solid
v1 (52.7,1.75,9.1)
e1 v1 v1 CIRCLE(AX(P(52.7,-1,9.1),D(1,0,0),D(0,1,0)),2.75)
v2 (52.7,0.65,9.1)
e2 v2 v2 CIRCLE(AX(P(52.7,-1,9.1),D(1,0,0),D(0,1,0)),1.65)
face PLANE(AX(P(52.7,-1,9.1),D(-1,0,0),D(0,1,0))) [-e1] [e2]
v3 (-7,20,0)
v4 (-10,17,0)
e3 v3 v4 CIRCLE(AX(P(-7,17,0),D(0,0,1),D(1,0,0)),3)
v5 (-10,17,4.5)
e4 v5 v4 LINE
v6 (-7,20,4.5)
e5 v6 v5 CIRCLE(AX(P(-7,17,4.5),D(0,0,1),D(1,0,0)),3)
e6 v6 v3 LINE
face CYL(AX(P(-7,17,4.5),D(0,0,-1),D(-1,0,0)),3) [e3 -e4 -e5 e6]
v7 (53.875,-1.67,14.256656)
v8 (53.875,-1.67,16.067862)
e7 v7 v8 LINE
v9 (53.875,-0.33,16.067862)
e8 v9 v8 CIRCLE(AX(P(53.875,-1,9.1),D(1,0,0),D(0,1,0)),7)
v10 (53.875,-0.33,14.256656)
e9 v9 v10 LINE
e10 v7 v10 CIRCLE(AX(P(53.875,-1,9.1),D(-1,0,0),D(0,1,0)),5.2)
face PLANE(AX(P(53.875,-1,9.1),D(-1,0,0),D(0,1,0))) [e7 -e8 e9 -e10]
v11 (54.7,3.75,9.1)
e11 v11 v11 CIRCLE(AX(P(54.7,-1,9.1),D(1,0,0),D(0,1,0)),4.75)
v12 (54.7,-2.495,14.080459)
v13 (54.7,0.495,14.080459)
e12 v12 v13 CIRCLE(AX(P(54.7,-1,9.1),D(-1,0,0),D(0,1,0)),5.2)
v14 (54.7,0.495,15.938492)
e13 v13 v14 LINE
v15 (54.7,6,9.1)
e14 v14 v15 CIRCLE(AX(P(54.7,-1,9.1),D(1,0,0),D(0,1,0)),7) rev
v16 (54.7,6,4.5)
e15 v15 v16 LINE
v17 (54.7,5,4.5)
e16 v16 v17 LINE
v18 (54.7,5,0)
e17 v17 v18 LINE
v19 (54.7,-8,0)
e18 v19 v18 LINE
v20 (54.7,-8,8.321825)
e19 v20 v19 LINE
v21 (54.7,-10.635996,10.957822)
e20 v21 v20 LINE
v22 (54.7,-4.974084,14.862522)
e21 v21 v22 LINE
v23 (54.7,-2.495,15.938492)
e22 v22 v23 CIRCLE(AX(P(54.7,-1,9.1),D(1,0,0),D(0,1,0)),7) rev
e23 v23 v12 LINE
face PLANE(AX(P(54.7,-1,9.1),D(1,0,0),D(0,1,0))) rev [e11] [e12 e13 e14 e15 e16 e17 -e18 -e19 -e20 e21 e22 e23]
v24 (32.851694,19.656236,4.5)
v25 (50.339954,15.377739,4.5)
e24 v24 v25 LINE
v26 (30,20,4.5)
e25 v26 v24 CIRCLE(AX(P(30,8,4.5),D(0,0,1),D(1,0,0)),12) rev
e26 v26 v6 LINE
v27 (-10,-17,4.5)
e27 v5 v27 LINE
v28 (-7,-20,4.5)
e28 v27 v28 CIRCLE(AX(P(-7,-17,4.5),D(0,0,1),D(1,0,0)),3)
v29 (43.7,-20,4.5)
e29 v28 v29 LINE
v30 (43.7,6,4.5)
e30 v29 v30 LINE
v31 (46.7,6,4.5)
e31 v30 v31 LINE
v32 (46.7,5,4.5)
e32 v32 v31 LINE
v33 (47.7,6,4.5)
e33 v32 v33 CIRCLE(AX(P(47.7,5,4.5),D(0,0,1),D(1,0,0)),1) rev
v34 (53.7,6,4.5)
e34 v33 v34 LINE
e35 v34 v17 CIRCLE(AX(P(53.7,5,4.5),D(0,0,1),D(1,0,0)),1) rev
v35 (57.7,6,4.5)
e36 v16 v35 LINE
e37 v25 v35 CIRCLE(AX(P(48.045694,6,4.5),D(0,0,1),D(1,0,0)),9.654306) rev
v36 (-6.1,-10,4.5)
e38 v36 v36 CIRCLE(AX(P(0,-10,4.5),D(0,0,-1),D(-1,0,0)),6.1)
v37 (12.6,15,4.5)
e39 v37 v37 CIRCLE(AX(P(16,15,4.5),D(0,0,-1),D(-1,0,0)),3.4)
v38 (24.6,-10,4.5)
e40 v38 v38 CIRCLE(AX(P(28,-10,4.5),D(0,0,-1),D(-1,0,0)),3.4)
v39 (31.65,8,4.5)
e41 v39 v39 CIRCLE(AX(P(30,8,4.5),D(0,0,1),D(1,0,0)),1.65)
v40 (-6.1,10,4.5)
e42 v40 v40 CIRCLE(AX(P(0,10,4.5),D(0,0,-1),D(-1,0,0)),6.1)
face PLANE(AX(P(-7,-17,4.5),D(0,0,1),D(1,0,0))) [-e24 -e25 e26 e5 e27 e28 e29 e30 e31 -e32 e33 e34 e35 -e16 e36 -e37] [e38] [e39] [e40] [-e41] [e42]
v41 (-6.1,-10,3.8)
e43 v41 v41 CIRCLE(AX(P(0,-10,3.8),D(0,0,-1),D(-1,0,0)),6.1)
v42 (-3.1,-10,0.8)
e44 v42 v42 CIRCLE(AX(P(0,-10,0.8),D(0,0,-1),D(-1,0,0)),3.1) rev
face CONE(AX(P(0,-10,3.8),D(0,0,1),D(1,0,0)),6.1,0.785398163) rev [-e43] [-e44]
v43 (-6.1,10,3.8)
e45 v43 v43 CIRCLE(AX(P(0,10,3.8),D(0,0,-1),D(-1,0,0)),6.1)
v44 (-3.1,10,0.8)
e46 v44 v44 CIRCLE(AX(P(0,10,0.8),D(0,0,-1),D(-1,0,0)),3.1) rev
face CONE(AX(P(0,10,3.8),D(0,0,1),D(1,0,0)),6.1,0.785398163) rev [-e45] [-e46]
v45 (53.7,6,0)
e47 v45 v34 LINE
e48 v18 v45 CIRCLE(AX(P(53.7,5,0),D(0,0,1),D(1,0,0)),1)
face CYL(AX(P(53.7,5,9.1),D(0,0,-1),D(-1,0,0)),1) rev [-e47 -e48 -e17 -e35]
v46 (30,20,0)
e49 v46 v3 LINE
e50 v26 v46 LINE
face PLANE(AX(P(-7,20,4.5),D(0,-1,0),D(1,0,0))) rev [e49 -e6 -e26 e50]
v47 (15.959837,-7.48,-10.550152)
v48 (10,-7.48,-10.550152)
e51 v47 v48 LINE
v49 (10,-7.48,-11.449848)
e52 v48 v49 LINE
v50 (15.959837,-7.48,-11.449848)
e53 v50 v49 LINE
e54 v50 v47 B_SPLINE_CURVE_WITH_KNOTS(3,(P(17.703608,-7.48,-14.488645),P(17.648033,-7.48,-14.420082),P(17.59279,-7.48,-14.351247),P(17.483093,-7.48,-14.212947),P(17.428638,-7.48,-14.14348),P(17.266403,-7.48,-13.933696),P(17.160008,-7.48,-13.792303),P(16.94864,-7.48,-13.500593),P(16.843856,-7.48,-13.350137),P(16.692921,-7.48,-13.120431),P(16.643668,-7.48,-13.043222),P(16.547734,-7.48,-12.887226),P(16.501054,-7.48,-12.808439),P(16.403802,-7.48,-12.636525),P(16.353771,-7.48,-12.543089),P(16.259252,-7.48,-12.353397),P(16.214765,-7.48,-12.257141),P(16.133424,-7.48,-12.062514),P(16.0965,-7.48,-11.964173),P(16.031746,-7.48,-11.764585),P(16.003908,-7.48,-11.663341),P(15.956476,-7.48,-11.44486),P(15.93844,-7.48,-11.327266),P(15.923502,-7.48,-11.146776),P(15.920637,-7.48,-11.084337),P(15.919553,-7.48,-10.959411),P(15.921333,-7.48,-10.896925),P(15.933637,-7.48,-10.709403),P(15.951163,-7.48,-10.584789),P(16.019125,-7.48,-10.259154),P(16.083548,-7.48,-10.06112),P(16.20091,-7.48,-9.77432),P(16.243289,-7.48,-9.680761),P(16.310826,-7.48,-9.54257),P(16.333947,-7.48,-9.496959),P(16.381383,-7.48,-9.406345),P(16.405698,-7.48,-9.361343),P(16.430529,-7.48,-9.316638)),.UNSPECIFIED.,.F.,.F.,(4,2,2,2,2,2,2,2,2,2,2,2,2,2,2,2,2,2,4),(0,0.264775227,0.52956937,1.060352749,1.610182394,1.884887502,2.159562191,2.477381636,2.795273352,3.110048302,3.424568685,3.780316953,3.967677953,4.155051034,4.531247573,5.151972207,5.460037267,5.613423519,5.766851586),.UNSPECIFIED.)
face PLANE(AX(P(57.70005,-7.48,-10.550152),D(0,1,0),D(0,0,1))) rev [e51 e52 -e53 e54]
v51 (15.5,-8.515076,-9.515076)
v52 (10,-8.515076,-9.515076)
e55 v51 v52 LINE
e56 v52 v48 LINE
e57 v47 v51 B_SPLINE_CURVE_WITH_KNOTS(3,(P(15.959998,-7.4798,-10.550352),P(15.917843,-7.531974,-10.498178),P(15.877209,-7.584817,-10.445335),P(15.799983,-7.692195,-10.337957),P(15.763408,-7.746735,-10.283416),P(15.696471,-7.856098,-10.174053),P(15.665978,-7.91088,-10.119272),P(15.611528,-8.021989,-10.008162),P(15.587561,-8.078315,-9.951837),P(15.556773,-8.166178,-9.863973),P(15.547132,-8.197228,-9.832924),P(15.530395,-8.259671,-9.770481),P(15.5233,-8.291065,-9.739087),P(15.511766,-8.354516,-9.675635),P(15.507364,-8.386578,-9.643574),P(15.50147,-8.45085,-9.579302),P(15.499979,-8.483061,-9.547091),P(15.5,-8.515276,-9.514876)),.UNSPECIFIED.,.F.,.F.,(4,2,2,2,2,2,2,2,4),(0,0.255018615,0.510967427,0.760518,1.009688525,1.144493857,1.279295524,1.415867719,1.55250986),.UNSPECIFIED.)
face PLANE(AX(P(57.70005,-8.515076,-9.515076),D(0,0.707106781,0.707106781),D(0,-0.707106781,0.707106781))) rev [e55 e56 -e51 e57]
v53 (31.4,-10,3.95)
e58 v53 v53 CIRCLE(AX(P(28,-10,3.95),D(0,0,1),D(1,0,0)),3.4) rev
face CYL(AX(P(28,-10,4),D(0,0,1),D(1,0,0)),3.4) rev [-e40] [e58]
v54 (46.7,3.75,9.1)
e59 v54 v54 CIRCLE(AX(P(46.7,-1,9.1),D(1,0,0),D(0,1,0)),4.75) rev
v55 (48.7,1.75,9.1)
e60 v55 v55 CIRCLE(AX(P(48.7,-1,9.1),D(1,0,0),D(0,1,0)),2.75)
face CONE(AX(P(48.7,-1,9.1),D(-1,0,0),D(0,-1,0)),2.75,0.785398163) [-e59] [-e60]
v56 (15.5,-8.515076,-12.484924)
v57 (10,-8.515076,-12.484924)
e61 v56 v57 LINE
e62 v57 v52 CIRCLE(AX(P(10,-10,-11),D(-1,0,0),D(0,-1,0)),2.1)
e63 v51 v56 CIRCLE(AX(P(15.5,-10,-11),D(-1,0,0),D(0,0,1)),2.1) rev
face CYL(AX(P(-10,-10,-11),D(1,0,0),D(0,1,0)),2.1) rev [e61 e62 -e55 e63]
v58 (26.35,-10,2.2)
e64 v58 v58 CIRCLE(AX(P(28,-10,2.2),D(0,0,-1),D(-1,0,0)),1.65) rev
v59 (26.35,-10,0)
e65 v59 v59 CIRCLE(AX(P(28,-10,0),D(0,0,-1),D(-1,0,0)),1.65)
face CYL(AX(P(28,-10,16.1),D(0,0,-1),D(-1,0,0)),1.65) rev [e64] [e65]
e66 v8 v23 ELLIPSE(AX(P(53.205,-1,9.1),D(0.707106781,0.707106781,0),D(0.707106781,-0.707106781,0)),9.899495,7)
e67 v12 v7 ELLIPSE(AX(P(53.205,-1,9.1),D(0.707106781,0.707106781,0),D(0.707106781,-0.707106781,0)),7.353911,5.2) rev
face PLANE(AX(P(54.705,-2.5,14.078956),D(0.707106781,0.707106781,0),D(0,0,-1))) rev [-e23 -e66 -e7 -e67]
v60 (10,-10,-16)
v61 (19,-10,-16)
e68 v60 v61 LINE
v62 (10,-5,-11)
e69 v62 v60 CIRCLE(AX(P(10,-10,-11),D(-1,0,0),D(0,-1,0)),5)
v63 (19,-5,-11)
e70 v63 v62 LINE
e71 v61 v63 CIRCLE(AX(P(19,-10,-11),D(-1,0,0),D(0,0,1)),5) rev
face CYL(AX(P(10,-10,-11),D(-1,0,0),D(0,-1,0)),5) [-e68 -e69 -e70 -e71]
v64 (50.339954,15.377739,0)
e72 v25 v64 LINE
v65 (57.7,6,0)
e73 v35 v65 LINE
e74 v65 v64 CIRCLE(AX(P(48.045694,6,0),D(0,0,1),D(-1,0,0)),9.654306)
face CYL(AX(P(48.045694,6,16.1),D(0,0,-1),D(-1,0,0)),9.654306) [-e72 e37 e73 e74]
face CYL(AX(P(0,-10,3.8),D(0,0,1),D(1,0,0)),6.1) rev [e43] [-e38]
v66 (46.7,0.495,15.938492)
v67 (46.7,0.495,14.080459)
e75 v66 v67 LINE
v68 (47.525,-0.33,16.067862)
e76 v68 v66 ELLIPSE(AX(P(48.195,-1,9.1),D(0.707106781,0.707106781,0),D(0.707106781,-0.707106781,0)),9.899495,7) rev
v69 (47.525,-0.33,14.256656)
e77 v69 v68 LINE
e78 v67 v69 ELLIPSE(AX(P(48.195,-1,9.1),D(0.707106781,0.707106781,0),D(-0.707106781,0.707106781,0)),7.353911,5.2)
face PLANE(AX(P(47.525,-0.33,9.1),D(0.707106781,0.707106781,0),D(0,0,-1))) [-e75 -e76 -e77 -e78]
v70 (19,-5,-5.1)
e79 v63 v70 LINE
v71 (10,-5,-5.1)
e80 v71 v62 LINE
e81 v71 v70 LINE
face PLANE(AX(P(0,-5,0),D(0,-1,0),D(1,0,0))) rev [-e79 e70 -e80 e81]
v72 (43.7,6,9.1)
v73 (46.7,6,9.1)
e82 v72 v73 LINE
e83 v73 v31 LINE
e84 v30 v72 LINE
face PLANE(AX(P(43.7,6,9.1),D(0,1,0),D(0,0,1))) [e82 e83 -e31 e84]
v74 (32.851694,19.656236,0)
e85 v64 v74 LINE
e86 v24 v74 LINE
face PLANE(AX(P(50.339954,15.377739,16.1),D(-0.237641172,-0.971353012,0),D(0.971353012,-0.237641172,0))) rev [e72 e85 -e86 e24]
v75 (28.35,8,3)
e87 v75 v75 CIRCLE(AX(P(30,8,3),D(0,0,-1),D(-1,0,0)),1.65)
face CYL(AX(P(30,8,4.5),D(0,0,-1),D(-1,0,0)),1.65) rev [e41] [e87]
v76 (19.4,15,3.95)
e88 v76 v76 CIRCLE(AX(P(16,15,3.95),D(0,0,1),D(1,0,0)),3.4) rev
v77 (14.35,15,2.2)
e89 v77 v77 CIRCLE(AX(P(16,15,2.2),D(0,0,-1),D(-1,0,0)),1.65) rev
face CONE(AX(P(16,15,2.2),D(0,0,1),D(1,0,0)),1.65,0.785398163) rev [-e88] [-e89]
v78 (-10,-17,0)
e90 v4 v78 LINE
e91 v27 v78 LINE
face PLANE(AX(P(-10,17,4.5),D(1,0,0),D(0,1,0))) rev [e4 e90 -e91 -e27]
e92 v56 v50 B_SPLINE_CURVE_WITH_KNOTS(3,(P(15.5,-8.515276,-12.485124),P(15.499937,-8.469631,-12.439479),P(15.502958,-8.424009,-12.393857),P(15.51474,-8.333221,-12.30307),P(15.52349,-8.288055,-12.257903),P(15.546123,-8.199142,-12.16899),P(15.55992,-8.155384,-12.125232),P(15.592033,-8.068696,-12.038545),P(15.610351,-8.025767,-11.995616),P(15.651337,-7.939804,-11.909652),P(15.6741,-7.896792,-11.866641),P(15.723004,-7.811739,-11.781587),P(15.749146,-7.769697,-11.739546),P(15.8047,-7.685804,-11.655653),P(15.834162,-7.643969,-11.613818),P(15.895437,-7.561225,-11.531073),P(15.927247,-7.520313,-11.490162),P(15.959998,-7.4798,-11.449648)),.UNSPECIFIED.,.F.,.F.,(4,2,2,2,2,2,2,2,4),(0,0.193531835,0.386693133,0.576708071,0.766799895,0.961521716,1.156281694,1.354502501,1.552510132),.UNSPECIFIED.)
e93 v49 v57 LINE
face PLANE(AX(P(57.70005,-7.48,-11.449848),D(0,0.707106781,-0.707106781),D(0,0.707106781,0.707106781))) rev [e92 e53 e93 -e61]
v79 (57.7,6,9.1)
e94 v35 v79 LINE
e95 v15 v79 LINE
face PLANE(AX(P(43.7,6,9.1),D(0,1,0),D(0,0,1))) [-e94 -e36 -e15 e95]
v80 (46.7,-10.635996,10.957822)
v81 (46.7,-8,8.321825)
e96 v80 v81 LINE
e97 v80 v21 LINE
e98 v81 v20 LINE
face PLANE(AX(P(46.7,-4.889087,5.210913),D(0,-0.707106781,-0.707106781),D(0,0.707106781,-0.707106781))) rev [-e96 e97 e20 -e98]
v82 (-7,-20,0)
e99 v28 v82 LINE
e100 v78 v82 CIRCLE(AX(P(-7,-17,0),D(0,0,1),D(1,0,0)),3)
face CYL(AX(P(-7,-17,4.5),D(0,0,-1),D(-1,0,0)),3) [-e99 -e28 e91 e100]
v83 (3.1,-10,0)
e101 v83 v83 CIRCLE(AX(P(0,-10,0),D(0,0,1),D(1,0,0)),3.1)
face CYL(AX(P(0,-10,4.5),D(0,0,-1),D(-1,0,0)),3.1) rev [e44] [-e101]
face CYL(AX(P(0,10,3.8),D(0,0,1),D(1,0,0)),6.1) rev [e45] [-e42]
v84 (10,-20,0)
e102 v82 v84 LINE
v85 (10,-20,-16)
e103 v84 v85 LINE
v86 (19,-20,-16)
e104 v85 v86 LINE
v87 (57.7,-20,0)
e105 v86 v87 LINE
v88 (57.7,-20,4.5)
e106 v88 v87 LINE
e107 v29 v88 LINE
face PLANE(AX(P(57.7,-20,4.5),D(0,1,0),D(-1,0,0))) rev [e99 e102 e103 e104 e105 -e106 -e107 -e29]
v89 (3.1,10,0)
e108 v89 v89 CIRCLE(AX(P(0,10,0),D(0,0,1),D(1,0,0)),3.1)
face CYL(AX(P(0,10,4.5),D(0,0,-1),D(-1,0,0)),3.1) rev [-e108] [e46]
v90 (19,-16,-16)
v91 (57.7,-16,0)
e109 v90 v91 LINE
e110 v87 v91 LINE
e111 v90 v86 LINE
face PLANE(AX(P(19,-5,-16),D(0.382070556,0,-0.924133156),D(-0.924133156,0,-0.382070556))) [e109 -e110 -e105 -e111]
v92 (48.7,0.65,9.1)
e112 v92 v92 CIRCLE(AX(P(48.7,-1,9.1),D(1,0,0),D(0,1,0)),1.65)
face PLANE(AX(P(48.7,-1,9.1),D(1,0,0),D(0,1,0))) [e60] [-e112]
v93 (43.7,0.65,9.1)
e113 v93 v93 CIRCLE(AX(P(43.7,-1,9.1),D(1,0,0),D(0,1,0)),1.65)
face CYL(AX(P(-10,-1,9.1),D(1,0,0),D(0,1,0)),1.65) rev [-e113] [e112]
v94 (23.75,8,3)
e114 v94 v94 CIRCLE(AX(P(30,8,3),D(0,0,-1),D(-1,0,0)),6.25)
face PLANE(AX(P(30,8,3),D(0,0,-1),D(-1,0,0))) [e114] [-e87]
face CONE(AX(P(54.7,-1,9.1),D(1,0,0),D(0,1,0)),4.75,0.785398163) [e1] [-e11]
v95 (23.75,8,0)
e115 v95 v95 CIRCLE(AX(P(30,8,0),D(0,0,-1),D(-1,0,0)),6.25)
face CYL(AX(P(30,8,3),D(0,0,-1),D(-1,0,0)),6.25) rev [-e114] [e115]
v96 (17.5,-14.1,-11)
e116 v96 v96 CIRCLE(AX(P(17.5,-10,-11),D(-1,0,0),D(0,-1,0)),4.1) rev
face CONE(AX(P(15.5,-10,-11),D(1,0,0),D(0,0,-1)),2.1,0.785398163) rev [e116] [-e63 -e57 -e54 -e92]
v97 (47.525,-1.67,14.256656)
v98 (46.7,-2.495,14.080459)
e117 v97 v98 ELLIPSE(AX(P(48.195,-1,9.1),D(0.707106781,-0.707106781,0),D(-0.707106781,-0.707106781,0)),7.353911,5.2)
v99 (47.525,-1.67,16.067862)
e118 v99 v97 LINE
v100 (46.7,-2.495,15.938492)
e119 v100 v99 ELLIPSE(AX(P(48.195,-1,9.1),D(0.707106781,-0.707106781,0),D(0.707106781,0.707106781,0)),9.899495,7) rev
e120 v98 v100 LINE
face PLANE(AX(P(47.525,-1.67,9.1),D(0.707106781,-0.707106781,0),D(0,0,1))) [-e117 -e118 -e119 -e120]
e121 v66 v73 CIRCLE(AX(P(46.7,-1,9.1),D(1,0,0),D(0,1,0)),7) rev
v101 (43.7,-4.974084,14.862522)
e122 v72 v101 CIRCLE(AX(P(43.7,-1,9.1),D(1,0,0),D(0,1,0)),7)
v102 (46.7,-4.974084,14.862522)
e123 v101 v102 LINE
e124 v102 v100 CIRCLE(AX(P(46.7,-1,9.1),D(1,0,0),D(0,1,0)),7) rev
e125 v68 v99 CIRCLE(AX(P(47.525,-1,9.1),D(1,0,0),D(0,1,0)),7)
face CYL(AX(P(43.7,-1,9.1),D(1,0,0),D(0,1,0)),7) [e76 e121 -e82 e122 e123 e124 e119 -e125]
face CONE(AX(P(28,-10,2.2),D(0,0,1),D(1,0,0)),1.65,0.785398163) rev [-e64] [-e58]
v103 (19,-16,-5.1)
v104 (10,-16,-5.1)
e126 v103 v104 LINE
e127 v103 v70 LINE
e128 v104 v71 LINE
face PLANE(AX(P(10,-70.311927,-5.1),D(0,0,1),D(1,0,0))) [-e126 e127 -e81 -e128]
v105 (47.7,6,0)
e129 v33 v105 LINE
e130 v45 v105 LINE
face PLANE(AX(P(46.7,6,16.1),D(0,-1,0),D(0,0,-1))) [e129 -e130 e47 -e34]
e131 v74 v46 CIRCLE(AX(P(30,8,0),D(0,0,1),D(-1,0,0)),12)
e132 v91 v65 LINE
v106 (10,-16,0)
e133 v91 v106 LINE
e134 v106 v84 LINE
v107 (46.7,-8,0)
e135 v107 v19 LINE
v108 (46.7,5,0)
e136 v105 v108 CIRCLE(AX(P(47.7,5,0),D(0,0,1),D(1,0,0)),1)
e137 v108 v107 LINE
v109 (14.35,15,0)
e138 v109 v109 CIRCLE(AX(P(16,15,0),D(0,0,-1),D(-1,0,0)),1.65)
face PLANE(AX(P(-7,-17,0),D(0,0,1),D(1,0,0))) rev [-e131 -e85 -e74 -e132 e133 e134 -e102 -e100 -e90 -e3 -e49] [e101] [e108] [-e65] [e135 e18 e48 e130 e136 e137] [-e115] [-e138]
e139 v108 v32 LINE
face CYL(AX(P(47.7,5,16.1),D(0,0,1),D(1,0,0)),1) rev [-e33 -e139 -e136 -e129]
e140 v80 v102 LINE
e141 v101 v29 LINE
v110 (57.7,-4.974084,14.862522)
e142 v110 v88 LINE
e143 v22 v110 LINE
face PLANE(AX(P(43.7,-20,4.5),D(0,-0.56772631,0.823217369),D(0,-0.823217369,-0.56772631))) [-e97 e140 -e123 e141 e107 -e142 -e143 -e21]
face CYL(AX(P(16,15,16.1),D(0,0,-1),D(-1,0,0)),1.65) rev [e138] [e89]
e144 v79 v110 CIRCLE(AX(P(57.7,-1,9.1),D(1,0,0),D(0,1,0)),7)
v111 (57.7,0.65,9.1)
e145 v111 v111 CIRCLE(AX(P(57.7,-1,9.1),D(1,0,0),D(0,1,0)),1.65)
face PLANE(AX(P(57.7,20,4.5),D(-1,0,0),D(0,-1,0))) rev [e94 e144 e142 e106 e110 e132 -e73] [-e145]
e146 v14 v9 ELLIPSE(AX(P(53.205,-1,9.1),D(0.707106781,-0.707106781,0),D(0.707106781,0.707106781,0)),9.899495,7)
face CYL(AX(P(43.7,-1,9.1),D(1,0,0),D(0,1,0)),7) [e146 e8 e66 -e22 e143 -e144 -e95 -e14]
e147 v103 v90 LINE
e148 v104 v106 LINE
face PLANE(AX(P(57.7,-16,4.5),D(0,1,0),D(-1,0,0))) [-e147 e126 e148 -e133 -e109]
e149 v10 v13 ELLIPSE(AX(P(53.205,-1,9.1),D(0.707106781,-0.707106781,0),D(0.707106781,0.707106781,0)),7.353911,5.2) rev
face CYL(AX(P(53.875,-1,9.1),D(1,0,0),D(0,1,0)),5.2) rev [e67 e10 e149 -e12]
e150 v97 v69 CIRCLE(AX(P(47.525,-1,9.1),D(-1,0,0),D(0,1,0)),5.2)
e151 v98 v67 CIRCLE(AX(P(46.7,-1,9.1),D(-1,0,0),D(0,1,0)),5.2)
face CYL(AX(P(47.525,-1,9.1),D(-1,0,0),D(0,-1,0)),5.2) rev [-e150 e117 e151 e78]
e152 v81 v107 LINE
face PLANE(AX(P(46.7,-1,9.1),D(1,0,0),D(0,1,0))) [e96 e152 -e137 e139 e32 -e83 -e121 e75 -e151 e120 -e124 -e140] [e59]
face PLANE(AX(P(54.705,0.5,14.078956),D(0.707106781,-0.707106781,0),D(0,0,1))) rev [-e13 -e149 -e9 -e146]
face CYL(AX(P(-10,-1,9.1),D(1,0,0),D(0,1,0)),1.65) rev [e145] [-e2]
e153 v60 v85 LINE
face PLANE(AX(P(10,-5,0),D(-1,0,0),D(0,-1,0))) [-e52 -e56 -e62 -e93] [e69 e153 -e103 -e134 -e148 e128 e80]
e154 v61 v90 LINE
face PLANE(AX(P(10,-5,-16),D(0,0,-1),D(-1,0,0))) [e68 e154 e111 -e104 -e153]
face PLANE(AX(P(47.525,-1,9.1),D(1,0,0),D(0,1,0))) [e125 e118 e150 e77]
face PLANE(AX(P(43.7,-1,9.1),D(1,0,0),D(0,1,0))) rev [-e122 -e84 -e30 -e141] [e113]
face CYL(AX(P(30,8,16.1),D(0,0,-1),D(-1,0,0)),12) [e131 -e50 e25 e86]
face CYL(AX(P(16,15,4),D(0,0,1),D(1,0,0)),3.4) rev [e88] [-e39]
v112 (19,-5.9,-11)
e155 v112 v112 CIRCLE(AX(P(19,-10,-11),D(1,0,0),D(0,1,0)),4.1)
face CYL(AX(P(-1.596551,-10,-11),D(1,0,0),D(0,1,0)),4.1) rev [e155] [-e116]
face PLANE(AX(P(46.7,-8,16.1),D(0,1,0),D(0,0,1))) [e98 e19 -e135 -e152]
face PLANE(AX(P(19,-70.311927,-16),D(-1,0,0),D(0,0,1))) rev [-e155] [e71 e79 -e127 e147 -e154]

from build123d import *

# Parameters (mm, degrees)
SKETCH1_R           = 3.1
SKETCH1_R_2         = 1.65
BOSS_EXTRUDE1_DEPTH = 4.5
BOSS_EXTRUDE2_DEPTH = 15
BOSS_EXTRUDE3_DEPTH = 14
CUT_EXTRUDE1_DEPTH  = 11
SKETCH5_R           = 1.65
CUT_EXTRUDE2_DEPTH  = 73.405110317
CUT_EXTRUDE3_START  = -3
CUT_EXTRUDE3_DEPTH  = 8
FILLET1_R           = 5
SKETCH7_R           = 2.1
CUT_EXTRUDE4_DEPTH  = 47.44243749
SKETCH8_R           = 4.1
CUT_EXTRUDE5_DEPTH  = 1.5
CHAMFER1_SIZE       = 2
CUT_EXTRUDE6_DEPTH  = 64.154572281
CUT_EXTRUDE7_DEPTH  = 64.154572281
SKETCH11_R          = 1.65
CUT_EXTRUDE9_DEPTH  = 64.154572281
BOSS_EXTRUDE4_START = 2
SKETCH13_R          = 2.75
SKETCH13_R_2        = 1.65
BOSS_EXTRUDE4_DEPTH = 2
BOSS_EXTRUDE5_START = 0.825
BOSS_EXTRUDE5_DEPTH = 0.825
CHAMFER3_SIZE       = 2
SKETCH14_R          = 6.1
CUT_EXTRUDE10_DEPTH = 0.7
CHAMFER4_SIZE       = 3
CHAMFER5_SIZE       = 0.83
SKETCH16_R          = 3.4
CUT_EXTRUDE11_DEPTH = 0.5
CHAMFER6_SIZE       = 1.8
CUT_EXTRUDE12_DEPTH = 55.171025466
SKETCH18_R          = 6.25
CUT_EXTRUDE13_DEPTH = 3
FILLET2_R           = 1


# Some blends are built 0.0001 mm under size
with BuildPart() as part:
    # Sketch1 → Boss-Extrude1 (new body)
    with BuildSketch(Plane.XY):
        with BuildLine():
            Line((-10, 17), (-10, -17))
            ThreePointArc((-10, -17), (-9.121320344, -19.121320344), (-7, -20))
            Line((-7, -20), (57.7, -20))
            Line((57.7, -20), (57.7, 20))
            Line((57.7, 20), (10, 20))
            Line((10, 20), (-7, 20))
            ThreePointArc((-7, 20), (-9.121320344, 19.121320344), (-10, 17))
        make_face()
        with Locations((0, 10)):
            Circle(SKETCH1_R, mode=Mode.SUBTRACT)
        with Locations((0, -10)):
            Circle(SKETCH1_R, mode=Mode.SUBTRACT)
        with Locations((30, 8)):
            Circle(SKETCH1_R_2, mode=Mode.SUBTRACT)
    extrude(amount=BOSS_EXTRUDE1_DEPTH)

    # Sketch2 → Boss-Extrude2 (add)
    with BuildSketch(Plane.XZ.offset(20)):
        Polygon((10, 0), (10, -16), (19, -16), (57.7, 0), align=None)
    extrude(amount=-BOSS_EXTRUDE2_DEPTH)

    # Sketch3 → Boss-Extrude3 (add)
    with BuildSketch(Plane(origin=(57.7, 0, 0), x_dir=(0, 0, -1), z_dir=(1, 0, 0))):
        with BuildLine():
            Line((-9.1, 6), (-4.5, 6))
            Line((-4.5, 6), (-4.5, -20))
            Line((-4.5, -20), (-14.862521583, -4.974084173))
            ThreePointArc((-14.862521583, -4.974084173), (-15.297523264, 2.254336399), (-9.1, 6))
        make_face()
    extrude(amount=-BOSS_EXTRUDE3_DEPTH)

    # Sketch4 → Cut-Extrude1 (cut)
    with BuildSketch(Plane(origin=(0, -5, 0), x_dir=(1, 0, 0), z_dir=(0, 1, 0))):
        Polygon((10, 0), (57.7, 0), (57.7, 16), (19, 16), (19, 5.1), (10, 5.1), align=None)
    extrude(amount=-CUT_EXTRUDE1_DEPTH, mode=Mode.SUBTRACT)

    # Sketch5 → Cut-Extrude2 (cut, through all)
    with BuildSketch(Plane(origin=(57.7, 0, 0), x_dir=(0, 0, -1), z_dir=(1, 0, 0))):
        with Locations(Location((-9.1, -1, 0), (0, 0, 90))):
            Circle(SKETCH5_R)
    extrude(amount=-CUT_EXTRUDE2_DEPTH, mode=Mode.SUBTRACT)

    # Sketch6 → Cut-Extrude3 (cut)
    with BuildSketch(Plane(origin=(57.7, 0, 0), x_dir=(0, 0, -1), z_dir=(1, 0, 0)).offset(CUT_EXTRUDE3_START)):
        with BuildLine():
            Line((-5.210912703, -4.889087297), (-19.214201662, -18.892376255))
            Line((-19.214201662, -18.892376255), (-19.214201662, 16.892376255))
            Line((-19.214201662, 16.892376255), (-5.210912703, 2.889087297))
            ThreePointArc((-5.210912703, 2.889087297), (-3.6, -1), (-5.210912703, -4.889087297))
        make_face()
    extrude(amount=-CUT_EXTRUDE3_DEPTH, mode=Mode.SUBTRACT)

    # Fillet1
    fillet1_edges = [part.edges().sort_by_distance(p)[0] for p in [
        (14.5, -5, -16),
    ]]
    fillet(fillet1_edges, radius=FILLET1_R)

    # Sketch7 → Cut-Extrude4 (cut, through all)
    with BuildSketch(Plane(origin=(19, 0, 0), x_dir=(0, 0, -1), z_dir=(1, 0, 0))):
        with Locations(Location((11, -10, 0), (0, 0, 90))):
            Circle(SKETCH7_R)
    extrude(amount=-CUT_EXTRUDE4_DEPTH, mode=Mode.SUBTRACT)

    # Sketch8 → Cut-Extrude5 (cut)
    with BuildSketch(Plane(origin=(19, 0, 0), x_dir=(0, 0, -1), z_dir=(1, 0, 0))):
        with Locations(Location((11, -10, 0), (0, 0, 90))):
            Circle(SKETCH8_R)
    extrude(amount=-CUT_EXTRUDE5_DEPTH, mode=Mode.SUBTRACT)

    # Chamfer1
    chamfer1_edges = [part.edges().sort_by_distance(p)[0] for p in [
        (17.5, -12.1, -11),
    ]]
    chamfer(chamfer1_edges, length=CHAMFER1_SIZE - 0.0001)  # a hair under: the kernel refuses the full size

    # Sketch9 → Cut-Extrude6 (cut, through all)
    with BuildSketch(Plane.XY):
        Polygon((46.7, 6), (54.7, 6), (54.7, 3.5), (54.7, -5.5), (54.7, -8), (46.7, -8), (46.7, -5.5), (46.7, 3.5), align=None)
    extrude(amount=CUT_EXTRUDE6_DEPTH, mode=Mode.SUBTRACT)

    # Sketch10 → Cut-Extrude7 (cut, through all)
    with BuildSketch(Plane(origin=(0, 0, 0), x_dir=(-1, 0, 0), z_dir=(0, 0, -1))):
        with BuildLine():
            Line((-57.7, 6), (-57.7, 20))
            Line((-57.7, 20), (-30, 20))
            ThreePointArc((-30, 20), (-31.436169615, 19.913749067), (-32.851694068, 19.65623614))
            Line((-32.851694068, 19.65623614), (-50.33995445, 15.377739394))
            ThreePointArc((-50.33995445, 15.377739394), (-55.640268278, 11.96054248), (-57.7, 6))
        make_face()
    extrude(amount=-CUT_EXTRUDE7_DEPTH, mode=Mode.SUBTRACT)

    # Sketch11 → Cut-Extrude9 (cut, through all)
    with BuildSketch(Plane(origin=(0, 0, 0), x_dir=(-1, 0, 0), z_dir=(0, 0, -1))):
        with Locations((-16, 15)):
            Circle(SKETCH11_R)
        with Locations((-28, -10)):
            Circle(SKETCH11_R)
    extrude(amount=-CUT_EXTRUDE9_DEPTH, mode=Mode.SUBTRACT)

    # Sketch13 → Boss-Extrude4 (add)
    with BuildSketch(Plane(origin=(46.7, 0, 0), x_dir=(0, 0, -1), z_dir=(1, 0, 0)).offset(BOSS_EXTRUDE4_START)):
        with Locations(Location((-9.1, -1, 0), (0, 0, 90))):
            Circle(SKETCH13_R)
        with Locations(Location((-9.1, -1, 0), (0, 0, 90))):
            Circle(SKETCH13_R_2, mode=Mode.SUBTRACT)
    boss_extrude4 = extrude(amount=-BOSS_EXTRUDE4_DEPTH)

    # Sketch15 → Boss-Extrude5 (add)
    with BuildSketch(Plane(origin=(46.7, 0, 0), x_dir=(0, 0, -1), z_dir=(1, 0, 0)).offset(BOSS_EXTRUDE5_START)):
        with BuildLine():
            Line((-14.078955714, 0.5), (-15.937397166, 0.5))
            ThreePointArc((-15.937397166, 0.5), (-16.1, -1), (-15.937397166, -2.5))
            Line((-15.937397166, -2.5), (-14.078955714, -2.5))
            ThreePointArc((-14.078955714, -2.5), (-14.3, -1), (-14.078955714, 0.5))
        make_face()
    boss_extrude5 = extrude(amount=-BOSS_EXTRUDE5_DEPTH)

    # Mirror1: Boss-Extrude4, Boss-Extrude5 across plane
    add(boss_extrude4.mirror(Plane(origin=(50.7, 0, 0), x_dir=(0, 0, 1), z_dir=(1, 0, 0))))
    add(boss_extrude5.mirror(Plane(origin=(50.7, 0, 0), x_dir=(0, 0, 1), z_dir=(1, 0, 0))))

    # Chamfer3
    chamfer3_edges = [part.edges().sort_by_distance(p)[0] for p in [
        (46.7, -3.75, 9.1),
        (54.7, -3.75, 9.1),
    ]]
    chamfer(chamfer3_edges, length=CHAMFER3_SIZE - 0.0001)  # a hair under: the kernel refuses the full size

    # Sketch14 → Cut-Extrude10 (cut)
    with BuildSketch(Plane(origin=(0, 0, 4.5), x_dir=(-1, 0, 0), z_dir=(0, 0, -1))):
        with Locations((0, -10)):
            Circle(SKETCH14_R)
        with Locations((0, 10)):
            Circle(SKETCH14_R)
    extrude(amount=CUT_EXTRUDE10_DEPTH, mode=Mode.SUBTRACT)

    # Chamfer4
    chamfer4_edges = [part.edges().sort_by_distance(p)[0] for p in [
        (-3.1, -10, 3.8),
        (-3.1, 10, 3.8),
    ]]
    chamfer(chamfer4_edges, length=CHAMFER4_SIZE - 0.0001)  # a hair under: the kernel refuses the full size

    # Chamfer5
    # the kernel refuses this chamfer: 0.83 mm, written as the material it takes off along each edge
    with BuildSketch(Plane(origin=(53.875, -2.5, 18.071894046), x_dir=(0.9996219169112968, -0.027495876610586414, 0), z_dir=(0, 0, -1))) as chamfer5_piece_1_section:
        Polygon((CHAMFER5_SIZE * 0.999621916911, -CHAMFER5_SIZE * 0.0274958766106), (-CHAMFER5_SIZE * 0.0274958766106, -CHAMFER5_SIZE * 0.999621916911), (0, 0), align=None)
    chamfer5_piece_1 = extrude(amount=6.127435212, mode=Mode.PRIVATE)
    chamfer5_piece_1 = split(chamfer5_piece_1, bisect_by=Plane(origin=(54.7, -2.224603208, 15.069483683), z_dir=(-1, 0, 0)), keep=Keep.TOP, mode=Mode.PRIVATE)
    chamfer5_piece_1 = chamfer5_piece_1 - Plane(origin=(54.15228648, -1, 9.1), x_dir=(0, -0.2884615384615384, 0.957491483423431), z_dir=(-1, 0, 0)) * Cylinder(5.2, 16, mode=Mode.PRIVATE)
    add(chamfer5_piece_1, mode=Mode.SUBTRACT)
    with BuildSketch(Plane(origin=(53.875, 0.5, 11.944458834), x_dir=(0.9996219169112968, 0.027495876610586546, 0), z_dir=(0, 0, 1))) as chamfer5_piece_2_section:
        Polygon((CHAMFER5_SIZE * 0.999621916911, -CHAMFER5_SIZE * 0.0274958766106), (-CHAMFER5_SIZE * 0.0274958766106, -CHAMFER5_SIZE * 0.999621916911), (0, 0), align=None)
    chamfer5_piece_2 = extrude(amount=6.127435212, mode=Mode.PRIVATE)
    chamfer5_piece_2 = split(chamfer5_piece_2, bisect_by=Plane(origin=(54.7, 0.224603208, 15.069483683), z_dir=(-1, 0, 0)), keep=Keep.TOP, mode=Mode.PRIVATE)
    chamfer5_piece_2 = chamfer5_piece_2 - Plane(origin=(54.15228648, -1, 9.1), x_dir=(0, -0.2884615384615384, 0.957491483423431), z_dir=(-1, 0, 0)) * Cylinder(5.2, 16, mode=Mode.PRIVATE)
    add(chamfer5_piece_2, mode=Mode.SUBTRACT)
    with BuildSketch(Plane(origin=(47.525, -2.5, 18.071894046), x_dir=(-0.9996219169112968, -0.027495876610586414, 0), z_dir=(0, 0, -1))) as chamfer5_piece_3_section:
        Polygon((CHAMFER5_SIZE * 0.999621916911, CHAMFER5_SIZE * 0.0274958766106), (-CHAMFER5_SIZE * 0.0274958766106, CHAMFER5_SIZE * 0.999621916911), (0, 0), align=None)
    chamfer5_piece_3 = extrude(amount=6.127435212, mode=Mode.PRIVATE)
    chamfer5_piece_3 = split(chamfer5_piece_3, bisect_by=Plane(origin=(46.7, -2.224603208, 15.069483683), z_dir=(1, 0, 0)), keep=Keep.TOP, mode=Mode.PRIVATE)
    chamfer5_piece_3 = chamfer5_piece_3 - Plane(origin=(47.24771352, -1, 9.1), x_dir=(0, -0.2884615384615384, 0.957491483423431), z_dir=(1, 0, 0)) * Cylinder(5.2, 16, mode=Mode.PRIVATE)
    add(chamfer5_piece_3, mode=Mode.SUBTRACT)
    with BuildSketch(Plane(origin=(47.525, 0.5, 11.944458834), x_dir=(-0.9996219169112968, 0.027495876610586285, 0), z_dir=(0, 0, 1))) as chamfer5_piece_4_section:
        Polygon((CHAMFER5_SIZE * 0.999621916911, CHAMFER5_SIZE * 0.0274958766106), (-CHAMFER5_SIZE * 0.0274958766106, CHAMFER5_SIZE * 0.999621916911), (0, 0), align=None)
    chamfer5_piece_4 = extrude(amount=6.127435212, mode=Mode.PRIVATE)
    chamfer5_piece_4 = split(chamfer5_piece_4, bisect_by=Plane(origin=(46.7, 0.224603208, 15.069483683), z_dir=(1, 0, 0)), keep=Keep.TOP, mode=Mode.PRIVATE)
    chamfer5_piece_4 = chamfer5_piece_4 - Plane(origin=(47.24771352, -1, 9.1), x_dir=(0, -0.2884615384615384, 0.957491483423431), z_dir=(1, 0, 0)) * Cylinder(5.2, 16, mode=Mode.PRIVATE)
    add(chamfer5_piece_4, mode=Mode.SUBTRACT)

    # Sketch16 → Cut-Extrude11 (cut)
    with BuildSketch(Plane(origin=(0, 0, 4.5), x_dir=(-1, 0, 0), z_dir=(0, 0, -1))):
        with Locations((-28, -10)):
            Circle(SKETCH16_R)
        with Locations((-16, 15)):
            Circle(SKETCH16_R)
    extrude(amount=CUT_EXTRUDE11_DEPTH, mode=Mode.SUBTRACT)

    # Chamfer6
    # the kernel refuses this chamfer: 1.8 mm, written as the material it takes off along each edge
    with BuildSketch(Plane(origin=(28, -10, 4), x_dir=(-1, 0, 0), z_dir=(0, -1, 0))) as chamfer6_piece_1_section:
        Polygon((1.65, CHAMFER6_SIZE), (1.65 + CHAMFER6_SIZE, 0), (1.65, 0), align=None)
    chamfer6_piece_1 = revolve(axis=Axis((28, -10, 4), (0, 0, -1)), mode=Mode.PRIVATE)
    chamfer6_piece_1 = chamfer6_piece_1 & Plane(origin=(28, -10, 3.070206715), x_dir=(-1, 0, 0), z_dir=(0, 0, 1)) * Cylinder(3.4, 14, mode=Mode.PRIVATE)
    add(chamfer6_piece_1, mode=Mode.SUBTRACT)
    with BuildSketch(Plane(origin=(16, 15, 4), x_dir=(-1, 0, 0), z_dir=(0, -1, 0))) as chamfer6_piece_2_section:
        Polygon((1.65, CHAMFER6_SIZE), (1.65 + CHAMFER6_SIZE, 0), (1.65, 0), align=None)
    chamfer6_piece_2 = revolve(axis=Axis((16, 15, 4), (0, 0, -1)), mode=Mode.PRIVATE)
    chamfer6_piece_2 = chamfer6_piece_2 & Plane(origin=(16, 15, 3.070206715), x_dir=(-1, 0, 0), z_dir=(0, 0, 1)) * Cylinder(3.4, 14, mode=Mode.PRIVATE)
    add(chamfer6_piece_2, mode=Mode.SUBTRACT)

    # Sketch17 → Cut-Extrude12 (cut, through all)
    with BuildSketch(Plane.ZY.offset(-10)):
        Polygon((-11, -10), (-9.51507576, -8.51507576), (-10.550151519, -7.48), (-11.449848481, -7.48), (-12.48492424, -8.51507576), align=None)
    extrude(amount=-CUT_EXTRUDE12_DEPTH, mode=Mode.SUBTRACT)

    # Sketch18 → Cut-Extrude13 (cut)
    with BuildSketch(Plane(origin=(0, 0, 0), x_dir=(-1, 0, 0), z_dir=(0, 0, -1))):
        with Locations((-30, 8)):
            Circle(SKETCH18_R)
    extrude(amount=-CUT_EXTRUDE13_DEPTH, mode=Mode.SUBTRACT)

    # Fillet2
    fillet2_edges = [part.edges().sort_by_distance(p)[0] for p in [
        (46.7, 6, 2.25),
        (54.7, 6, 2.25),
    ]]
    fillet(fillet2_edges, radius=FILLET2_R)


solid = part.part
